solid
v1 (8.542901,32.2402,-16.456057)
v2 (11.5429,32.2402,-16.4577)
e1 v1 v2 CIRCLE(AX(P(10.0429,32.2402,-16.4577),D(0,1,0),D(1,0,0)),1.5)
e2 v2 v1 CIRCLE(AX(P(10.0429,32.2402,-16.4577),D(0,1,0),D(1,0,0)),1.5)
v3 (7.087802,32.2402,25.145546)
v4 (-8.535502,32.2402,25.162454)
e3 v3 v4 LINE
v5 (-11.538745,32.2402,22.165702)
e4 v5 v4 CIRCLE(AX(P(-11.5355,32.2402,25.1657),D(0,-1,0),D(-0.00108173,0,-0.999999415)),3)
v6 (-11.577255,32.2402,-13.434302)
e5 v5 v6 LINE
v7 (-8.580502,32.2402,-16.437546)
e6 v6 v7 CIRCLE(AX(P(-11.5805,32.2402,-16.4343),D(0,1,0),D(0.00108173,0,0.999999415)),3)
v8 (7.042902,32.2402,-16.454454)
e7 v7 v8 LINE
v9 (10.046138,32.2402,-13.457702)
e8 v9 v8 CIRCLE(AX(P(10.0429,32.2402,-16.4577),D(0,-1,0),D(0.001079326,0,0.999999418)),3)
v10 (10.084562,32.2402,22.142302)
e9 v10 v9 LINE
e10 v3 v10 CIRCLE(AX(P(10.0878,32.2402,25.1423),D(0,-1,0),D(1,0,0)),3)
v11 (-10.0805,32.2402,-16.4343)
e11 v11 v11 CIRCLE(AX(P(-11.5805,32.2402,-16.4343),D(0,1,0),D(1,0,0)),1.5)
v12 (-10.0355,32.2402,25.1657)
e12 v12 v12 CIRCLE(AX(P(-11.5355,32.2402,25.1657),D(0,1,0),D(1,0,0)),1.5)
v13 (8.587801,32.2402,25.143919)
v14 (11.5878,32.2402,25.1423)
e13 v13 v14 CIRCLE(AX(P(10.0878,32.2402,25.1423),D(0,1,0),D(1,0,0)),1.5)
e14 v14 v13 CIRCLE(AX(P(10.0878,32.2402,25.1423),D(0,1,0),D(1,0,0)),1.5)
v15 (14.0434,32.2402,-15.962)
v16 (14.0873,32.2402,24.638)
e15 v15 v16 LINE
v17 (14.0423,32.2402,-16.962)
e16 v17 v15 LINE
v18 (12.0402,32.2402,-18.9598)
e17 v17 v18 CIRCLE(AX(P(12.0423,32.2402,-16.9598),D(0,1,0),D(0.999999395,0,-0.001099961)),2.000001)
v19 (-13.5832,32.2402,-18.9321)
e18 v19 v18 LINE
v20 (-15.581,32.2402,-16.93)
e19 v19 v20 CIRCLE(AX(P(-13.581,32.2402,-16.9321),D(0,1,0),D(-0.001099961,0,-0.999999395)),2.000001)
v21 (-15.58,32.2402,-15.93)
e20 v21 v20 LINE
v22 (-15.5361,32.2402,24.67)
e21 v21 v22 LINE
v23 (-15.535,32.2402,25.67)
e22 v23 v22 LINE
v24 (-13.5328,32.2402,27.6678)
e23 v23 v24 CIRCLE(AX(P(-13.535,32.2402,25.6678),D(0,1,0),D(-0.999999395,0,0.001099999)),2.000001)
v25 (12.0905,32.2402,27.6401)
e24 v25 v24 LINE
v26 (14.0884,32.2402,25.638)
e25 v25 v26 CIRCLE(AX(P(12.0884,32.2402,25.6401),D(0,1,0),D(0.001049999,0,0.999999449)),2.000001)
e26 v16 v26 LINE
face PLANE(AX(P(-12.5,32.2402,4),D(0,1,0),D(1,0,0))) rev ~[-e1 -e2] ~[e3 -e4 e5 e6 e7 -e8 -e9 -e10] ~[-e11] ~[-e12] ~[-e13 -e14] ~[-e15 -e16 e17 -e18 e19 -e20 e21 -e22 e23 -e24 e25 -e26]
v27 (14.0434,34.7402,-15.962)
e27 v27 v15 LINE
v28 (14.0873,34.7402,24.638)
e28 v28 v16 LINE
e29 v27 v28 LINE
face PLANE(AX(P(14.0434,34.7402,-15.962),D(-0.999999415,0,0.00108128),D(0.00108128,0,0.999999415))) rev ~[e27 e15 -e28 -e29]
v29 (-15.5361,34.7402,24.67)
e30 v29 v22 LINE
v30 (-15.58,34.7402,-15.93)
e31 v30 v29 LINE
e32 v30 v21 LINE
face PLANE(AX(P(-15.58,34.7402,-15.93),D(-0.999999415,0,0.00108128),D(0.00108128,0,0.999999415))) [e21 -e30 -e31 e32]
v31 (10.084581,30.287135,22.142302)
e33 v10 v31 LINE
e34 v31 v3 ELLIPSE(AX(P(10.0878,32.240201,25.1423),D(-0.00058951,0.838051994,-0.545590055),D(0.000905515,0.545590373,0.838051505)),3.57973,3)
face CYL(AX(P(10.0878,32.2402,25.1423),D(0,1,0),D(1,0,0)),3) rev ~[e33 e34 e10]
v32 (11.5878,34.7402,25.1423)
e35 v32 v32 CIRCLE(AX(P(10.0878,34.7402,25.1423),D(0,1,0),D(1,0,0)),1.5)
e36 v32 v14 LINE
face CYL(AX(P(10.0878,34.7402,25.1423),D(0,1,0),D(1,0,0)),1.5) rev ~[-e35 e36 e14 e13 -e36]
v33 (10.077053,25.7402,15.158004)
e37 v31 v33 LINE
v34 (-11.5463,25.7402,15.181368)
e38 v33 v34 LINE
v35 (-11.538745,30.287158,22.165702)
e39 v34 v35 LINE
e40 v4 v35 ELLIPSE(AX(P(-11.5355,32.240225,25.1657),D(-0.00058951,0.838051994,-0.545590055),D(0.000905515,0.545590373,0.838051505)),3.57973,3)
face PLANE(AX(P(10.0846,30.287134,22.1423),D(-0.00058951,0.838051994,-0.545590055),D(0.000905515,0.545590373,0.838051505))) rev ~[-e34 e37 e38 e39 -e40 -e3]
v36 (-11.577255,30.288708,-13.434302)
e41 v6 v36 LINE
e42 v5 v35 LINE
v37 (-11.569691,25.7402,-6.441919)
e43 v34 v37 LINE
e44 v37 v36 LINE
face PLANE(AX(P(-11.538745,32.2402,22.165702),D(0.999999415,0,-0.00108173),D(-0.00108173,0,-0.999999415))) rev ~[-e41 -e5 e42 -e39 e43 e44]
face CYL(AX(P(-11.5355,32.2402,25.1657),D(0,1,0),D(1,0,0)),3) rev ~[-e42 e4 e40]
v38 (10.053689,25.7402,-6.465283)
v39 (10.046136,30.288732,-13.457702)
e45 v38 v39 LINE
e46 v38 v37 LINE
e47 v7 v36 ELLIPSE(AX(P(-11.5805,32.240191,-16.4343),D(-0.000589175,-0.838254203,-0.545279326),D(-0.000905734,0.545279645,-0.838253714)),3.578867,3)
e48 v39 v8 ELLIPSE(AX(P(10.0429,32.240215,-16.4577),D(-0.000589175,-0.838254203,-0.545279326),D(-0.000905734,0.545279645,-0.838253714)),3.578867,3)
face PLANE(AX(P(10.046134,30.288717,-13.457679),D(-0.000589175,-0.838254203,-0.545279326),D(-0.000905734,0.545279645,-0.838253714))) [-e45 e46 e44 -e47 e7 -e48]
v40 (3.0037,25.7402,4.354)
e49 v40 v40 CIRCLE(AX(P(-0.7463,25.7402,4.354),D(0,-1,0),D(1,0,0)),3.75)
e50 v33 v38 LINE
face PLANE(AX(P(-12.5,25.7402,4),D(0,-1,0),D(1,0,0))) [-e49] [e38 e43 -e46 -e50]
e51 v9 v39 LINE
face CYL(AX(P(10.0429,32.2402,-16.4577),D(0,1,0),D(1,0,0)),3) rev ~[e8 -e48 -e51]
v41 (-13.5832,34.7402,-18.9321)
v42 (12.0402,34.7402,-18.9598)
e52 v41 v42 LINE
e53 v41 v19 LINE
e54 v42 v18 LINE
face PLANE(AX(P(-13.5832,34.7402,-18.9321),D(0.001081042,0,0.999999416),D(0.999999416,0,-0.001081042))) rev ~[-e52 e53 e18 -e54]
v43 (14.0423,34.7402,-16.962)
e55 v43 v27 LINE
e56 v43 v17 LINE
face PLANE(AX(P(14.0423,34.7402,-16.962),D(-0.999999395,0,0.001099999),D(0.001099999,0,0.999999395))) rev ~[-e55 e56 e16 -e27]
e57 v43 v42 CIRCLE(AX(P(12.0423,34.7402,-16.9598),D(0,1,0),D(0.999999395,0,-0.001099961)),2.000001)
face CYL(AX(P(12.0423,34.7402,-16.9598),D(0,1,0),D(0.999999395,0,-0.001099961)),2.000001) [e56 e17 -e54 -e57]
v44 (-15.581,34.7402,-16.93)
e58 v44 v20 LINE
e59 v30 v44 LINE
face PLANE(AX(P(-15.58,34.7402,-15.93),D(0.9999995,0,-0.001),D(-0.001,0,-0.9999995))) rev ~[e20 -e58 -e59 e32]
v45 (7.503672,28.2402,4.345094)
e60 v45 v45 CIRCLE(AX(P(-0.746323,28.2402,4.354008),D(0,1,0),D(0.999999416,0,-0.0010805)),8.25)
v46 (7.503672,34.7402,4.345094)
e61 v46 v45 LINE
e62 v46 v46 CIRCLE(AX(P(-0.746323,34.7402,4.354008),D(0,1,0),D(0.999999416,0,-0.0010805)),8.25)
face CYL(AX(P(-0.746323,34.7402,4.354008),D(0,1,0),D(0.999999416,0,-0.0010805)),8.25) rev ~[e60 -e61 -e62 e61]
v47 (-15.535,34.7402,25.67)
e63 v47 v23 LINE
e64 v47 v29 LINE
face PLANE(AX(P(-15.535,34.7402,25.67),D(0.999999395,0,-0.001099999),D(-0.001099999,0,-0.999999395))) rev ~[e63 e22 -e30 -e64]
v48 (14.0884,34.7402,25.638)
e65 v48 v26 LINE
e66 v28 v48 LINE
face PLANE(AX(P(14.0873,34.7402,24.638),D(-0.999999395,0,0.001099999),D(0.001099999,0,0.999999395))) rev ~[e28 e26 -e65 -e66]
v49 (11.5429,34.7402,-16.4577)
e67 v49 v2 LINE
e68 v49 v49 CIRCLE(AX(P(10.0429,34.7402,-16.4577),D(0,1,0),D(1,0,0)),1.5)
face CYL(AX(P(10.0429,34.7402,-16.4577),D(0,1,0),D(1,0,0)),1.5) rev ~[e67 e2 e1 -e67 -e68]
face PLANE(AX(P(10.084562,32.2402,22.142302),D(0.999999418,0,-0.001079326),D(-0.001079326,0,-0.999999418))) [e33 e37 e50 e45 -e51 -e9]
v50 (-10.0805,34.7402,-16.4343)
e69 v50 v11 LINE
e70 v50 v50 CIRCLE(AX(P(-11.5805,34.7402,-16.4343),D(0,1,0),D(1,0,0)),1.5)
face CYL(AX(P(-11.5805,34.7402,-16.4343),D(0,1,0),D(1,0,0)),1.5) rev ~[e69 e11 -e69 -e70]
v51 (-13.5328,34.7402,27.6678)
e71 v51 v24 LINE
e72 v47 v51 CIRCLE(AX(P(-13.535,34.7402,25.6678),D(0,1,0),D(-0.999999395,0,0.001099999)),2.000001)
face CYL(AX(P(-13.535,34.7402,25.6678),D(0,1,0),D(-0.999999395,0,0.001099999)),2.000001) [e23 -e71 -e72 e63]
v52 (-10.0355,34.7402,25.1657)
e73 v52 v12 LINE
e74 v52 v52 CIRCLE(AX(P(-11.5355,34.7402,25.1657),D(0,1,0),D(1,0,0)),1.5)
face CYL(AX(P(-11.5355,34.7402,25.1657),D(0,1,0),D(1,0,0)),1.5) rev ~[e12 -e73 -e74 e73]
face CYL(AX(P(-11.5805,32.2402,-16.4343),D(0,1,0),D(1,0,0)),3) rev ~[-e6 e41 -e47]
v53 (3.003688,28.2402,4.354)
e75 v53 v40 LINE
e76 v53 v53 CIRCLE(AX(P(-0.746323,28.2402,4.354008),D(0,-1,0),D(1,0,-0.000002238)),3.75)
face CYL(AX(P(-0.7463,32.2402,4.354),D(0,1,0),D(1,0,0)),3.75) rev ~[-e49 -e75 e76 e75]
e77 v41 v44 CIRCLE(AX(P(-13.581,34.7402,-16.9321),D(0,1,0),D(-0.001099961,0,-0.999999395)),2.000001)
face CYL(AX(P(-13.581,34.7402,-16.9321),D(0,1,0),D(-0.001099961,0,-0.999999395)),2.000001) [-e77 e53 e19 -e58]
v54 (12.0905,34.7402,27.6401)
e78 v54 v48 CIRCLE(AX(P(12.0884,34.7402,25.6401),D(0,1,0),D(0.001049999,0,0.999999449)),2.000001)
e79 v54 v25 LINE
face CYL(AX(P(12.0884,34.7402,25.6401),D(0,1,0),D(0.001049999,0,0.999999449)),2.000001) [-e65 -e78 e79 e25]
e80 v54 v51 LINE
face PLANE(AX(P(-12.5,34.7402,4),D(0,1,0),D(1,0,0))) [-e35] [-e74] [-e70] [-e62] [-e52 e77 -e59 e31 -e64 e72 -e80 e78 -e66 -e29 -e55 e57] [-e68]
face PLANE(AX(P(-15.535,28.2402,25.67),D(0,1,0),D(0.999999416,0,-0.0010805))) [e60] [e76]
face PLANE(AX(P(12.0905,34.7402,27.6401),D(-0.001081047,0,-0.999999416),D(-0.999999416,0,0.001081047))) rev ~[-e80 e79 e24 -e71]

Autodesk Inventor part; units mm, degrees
ref_plane "YZ Plane" through (0, 0, 0) normal (1, 0, 0) x (0, 1, 0)
sketch "Sketch1" plane through (0, 0, 0) normal (0, 0, 1) x (1, 0, 0)
  circle A0 centre (10.25, -9.75) radius 1.1 projected
  circle A1 centre (-10.25, -9.75) radius 1.1 projected
  circle A2 centre (-10.25, 3.75) radius 1.1 projected
  circle A3 centre (10.25, 3.75) radius 1.1 projected
  circle A4 centre (9.25, -4) radius 1.5 projected
  circle A5 centre (-9.25, -4) radius 1.5 projected
  arc A6 (7.25, -4) -> (11.25, -4) centre (9.25, -4) ccw
  arc A7 (-11.25, -4) -> (-7.25, -4) centre (-9.25, -4) ccw
  line L0 (8.2, -12) -> (-8.2, -12) projected
  line L1 (12.5, 1) -> (12.5, -7.7) projected
  line L2 (-12.5, 12) -> (12.5, 12) projected
  line L3 (-12.5, -7.7) -> (-12.5, 1) projected
  line L4 (12.5, -12) -> (-12.5, -12)
  line L5 (-12.5, -12) -> (-12.5, 12)
  line L6 (-12.5, 12) -> (12.5, 12)
  line L7 (12.5, 12) -> (12.5, -12)
  line L8 (-9.25, -4) -> (-9.25, -3)
  line L9 (9.25, -4) -> (9.25, -3)
  line L10 (-11.25, -4) -> (-11.25, -3)
  line L11 (-7.25, -4) -> (-7.25, -3)
  line L12 (7.25, -4) -> (7.25, -3)
  line L13 (11.25, -4) -> (11.25, -3)
  arc A8 (-9.25, -5) -> (-7.7976, -4.375) centre (-9.25, -3) ccw
  arc A9 (-7.25, -3) -> (-11.25, -3) centre (-9.25, -3) ccw
  arc A10 (9.25, -5) -> (10.7024, -4.375) centre (9.25, -3) ccw
  arc A11 (11.25, -3) -> (7.25, -3) centre (9.25, -3) ccw
  point P0 (0, 0)
  dimension "d0" = 0.5
  dimension "d1" = 0.5
  dimension "d70" = 1
  dimension "d74" = 3.25
extrude "Extrusion1" add sketch "Sketch1" along normal blind 3 contours L0 L4 L5 L3 L2 L7 L1
sketch "Sketch2" plane through (-12.5, 12, 0) normal (0, 1, 0) x (1, 0, 0)
  line L0 (25, 0) -> (0, 0) projected
  line L1 (0, 0) -> (0, -3) projected
  line L2 (25, -3) -> (0, -3) projected
  line L3 (25, 0) -> (25, -3) projected
  point P0 (12.5, 0)
extrude "Extrusion2" add sketch "Sketch2" along normal blind 2
sketch "Sketch3" plane through (-12.5, 14, 0) normal (0, 1, 0) x (1, 0, 0)
  line L0 (0, 1) -> (25, 1) projected
  line L1 (25, 0) -> (0, 0) projected
  line L2 (0, -3) -> (25, -3) projected
  line L3 (0, -4) -> (25, -4)
  line L4 (0, 1) -> (25, 1)
  line L5 (25, 1) -> (25, -4)
  line L6 (25, -4) -> (0, -4)
  line L7 (0, -4) -> (0, 1)
  point P0 (12.5, 0)
  dimension "d6" = 1
extrude "Extrusion3" add sketch "Sketch3" along normal blind 7.5
sketch "Sketch8" plane through (-12.5, -12, 0) normal (-1, 0, 0) x (0, 0, 1)
  line L0 (4, 24) -> (3, 24)
  line L1 (3, 26) -> (4, 26) projected
  line L2 (3, 0) -> (3, 26) projected
  line L3 (0, 0) -> (0, 26) projected
  line L4 (-1, 26) -> (0, 26) projected
  line L5 (4, 24.1) -> (3, 24.1)
  line L6 (4, 24.1) -> (-1, 24.1)
  line L7 (0, 24.1) -> (-1, 24.1)
  line L8 (-1, 24.1) -> (-1, 26)
  line L9 (-1, 26) -> (0, 26)
  line L10 (0, 26) -> (0, 24.1)
  line L11 (3, 24.1) -> (4, 24.1)
  line L12 (4, 24.1) -> (4, 26)
  line L13 (4, 26) -> (3, 26)
  line L14 (3, 26) -> (3, 24.1)
  point P0 (0, 12)
  dimension "d22" = 0.1
extrude "Extrusion7" add sketch "Sketch8" against normal up to surface (25 mm away)
sketch "Sketch9" plane through (0, 0, 3) normal (0, 0, 1) x (1, 0, 0)
  circle A0 centre (10.25, -9.75) radius 1.1
  circle A1 centre (10.25, 3.75) radius 1.1
  circle A2 centre (-10.25, 3.75) radius 1.1
  circle A3 centre (-10.25, -9.75) radius 1.1
  circle A4 centre (-10.25, -9.75) radius 1
  circle A5 centre (-10.25, 3.75) radius 1
  circle A6 centre (10.25, 3.75) radius 1
  circle A7 centre (10.25, -9.75) radius 1
  point P0 (0, 0)
  dimension "d25" = 0.1
  dimension "d26" = 0.1
  dimension "d27" = 0.1
  dimension "d28" = 0.1
ref_plane "Work Plane1" through (-12.5, 0.8429, -0.9) normal (0, 0, -1) x (0, 1, 0)
extrude "Extrusion8" add sketch "Sketch9" against normal up to surface (3.9 mm away) contours A4 | A5 | A6 | A7
sketch "Sketch10" plane through (-10.25, 3.75, 3) normal (0, 0, 1) x (1, 0, 0)
  circle A0 centre (0, 0) radius 1.1
  circle A1 centre (0, -13.5) radius 1.1
  circle A2 centre (20.5, -13.5) radius 1.1
  circle A3 centre (20.5, 0) radius 1.1
  point P0 (10.25, -3.75)
extrude "Extrusion9" add sketch "Sketch10" against normal up to surface (3 mm away)
sketch "Sketch11" plane through (0, 0, 3) normal (0, 0, 1) x (1, 0, 0)
  circle A0 centre (10.25, -9.75) radius 1 projected
  circle A1 centre (10.25, 3.75) radius 1 projected
  circle A2 centre (-10.25, 3.75) radius 1 projected
  circle A3 centre (-10.25, -9.75) radius 1 projected
  point P0 (0, 0)
ref_plane "Work Plane2" through (8.65, 0.8429, 3.9) normal (0, 0, 1) x (1, 0, 0)
extrude "Extrusion10" add sketch "Sketch11" along normal up to surface (0.9 mm away)
sketch "Sketch12" plane through (-12.5, 21.5, 4) normal (0, 0, 1) x (1, 0, 0)
  line L0 (25, -9.4) -> (25, 0) projected
  line L1 (25, 0) -> (25, -4.7)
  line L2 (25, -4.7) -> (30, -4.7)
  line L3 (30, -4.7) -> (30, 0)
  line L4 (30, 0) -> (25, 0)
  line L5 (25, 0) -> (25, -4.7)
  line L6 (0, -9.4) -> (0, 0) projected
  line L7 (0, 0) -> (25, 0) projected
  line L8 (0, 0) -> (-5, 0)
  line L9 (-5, 0) -> (-5, -4.7)
  line L10 (-5, -4.7) -> (0, -4.7)
  line L11 (0, -4.7) -> (0, 0)
  point P0 (12.5, -21.5)
  dimension "d35" = 5
  dimension "d36" = 5
extrude "Extrusion11" add sketch "Sketch12" against normal up to surface (5 mm away)
sketch "Sketch13" plane through (-12.5, -12, 0) normal (0, -1, 0) x (1, 0, 0)
  line L0 (0, 0) -> (0, 3) projected
  line L1 (25, 0) -> (25, 3) projected
  line L2 (25.2, 0) -> (25.2, 3)
  line L3 (-0.2, 0) -> (-0.2, 3)
  line L4 (-5, 4) -> (-5, -1) projected
  line L5 (-5, -1) -> (0, -1) projected
  line L6 (-5, 4) -> (0, 4) projected
  line L7 (25, -1) -> (30, -1) projected
  line L8 (30, 4) -> (30, -1) projected
  line L9 (25, 4) -> (30, 4) projected
  line L10 (30, -1) -> (25.2, -1)
  line L11 (25.2, -1) -> (25.2, 4)
  line L12 (25.2, 4) -> (30, 4)
  line L13 (30, 4) -> (30, -1)
  line L14 (-5, -1) -> (-0.2, -1)
  line L15 (-0.2, -1) -> (-0.2, 4)
  line L16 (-0.2, 4) -> (-5, 4)
  line L17 (-5, 4) -> (-5, -1)
  line L18 (0, 0) -> (25, 0) projected
  line L19 (0, 0) -> (-0.2, 0)
  line L20 (0, 3) -> (-0.2, 3)
  line L21 (25, -1) -> (25, 0) projected
  line L22 (25, 0) -> (25.2, 0)
  line L23 (25, 3) -> (25.2, 3)
  point P0 (12.5, 0)
  point P1 (-0.2, 3)
  point P2 (-0.2, 0)
  dimension "d39" = 0.2
  dimension "d40" = 0.2
extrude "Extrusion12" add sketch "Sketch13" against normal blind 5.5 contours L19 L3 L20 L0 | L15 L5 L4 L6 L3 | L1 L23 L2 L22 | L2 L11 L9 L8 L7
sketch "Sketch14" plane through (-12.5, -6.5, 0) normal (0, 1, 0) x (1, 0, 0)
  circle A0 centre (-2.6, -1.5) radius 1.5
  circle A1 centre (27.6, -1.5) radius 1.5
  circle A2 centre (27.6, -1.5) radius 1.4
  circle A3 centre (-2.6, -1.5) radius 1.4
  point P0 (12.5, 0)
  dimension "d43" = 0.1
  dimension "d44" = 0.1
extrude "Extrusion13" cut sketch "Sketch14" against normal blind 5.5 contours A2 | A3
chamfer "Chamfer3" distance 0.2 angle 45 8 edges at (-12.7, -9.25, 4) (-17.5, -9.25, 4) (-12.7, -9.25, -1) (-17.5, -9.25, -1) (17.5, -9.25, 4) (12.7, -9.25, 4) (17.5, -9.25, -1) (12.7, -9.25, -1)
chamfer "Chamfer4" distance 3.9999 angle 45 2 edges at (-12.5, -6.5, 1.5) (12.5, -6.5, 1.5)
sketch "Sketch15" plane through (-17.5, 16.8, 4) normal (-1, 0, 0) x (0, 0, 1)
  circle A0 centre (-2.5, 2.35) radius 1.5
  circle A1 centre (-2.5, 2.35) radius 1.4
  point P0 (-4, -16.8)
  dimension "d53" = 0.1
extrude "Extrusion14" cut sketch "Sketch15" against normal blind 5.5 contours A1
sketch "Sketch16" plane through (17.5, 16.8, 4) normal (1, 0, 0) x (0, 0, -1)
  circle A0 centre (2.5, 2.35) radius 1.4 projected
  point P0 (4, -16.8)
extrude "Extrusion15" cut sketch "Sketch16" against normal blind 5.5
sketch "Sketch17" plane through (-12.5, 12.1, 4) normal (0, 0, 1) x (1, 0, 0)
  line L0 (25, 0) -> (25, 4.7) projected
  line L1 (0, 0) -> (0, 4.7) projected
  line L2 (30, 9.4) -> (-5, 9.4) projected
  line L3 (24.5905, 22.6402) -> (-1.0328, 22.6402)
  line L4 (25, 9.4) -> (0, 9.4)
  line L5 (0, 9.4) -> (0, 22.6402)
  line L6 (0, 22.6402) -> (25, 22.6402)
  line L7 (25, 22.6402) -> (25, 9.4)
  point P0 (12.5, -12.1)
  dimension "d58" = 25
extrude "Extrusion16" add sketch "Sketch17" against normal up to surface (5 mm away)
sketch "Sketch18" plane through (-12.5, 34.7402, 4) normal (0, 1, 0) x (1, 0, 0)
  circle A0 centre (22.5429, 20.4577) radius 1.5 construction
  circle A1 centre (22.5429, 20.4577) radius 1.5
  circle A2 centre (0.9195, 20.4343) radius 1.5
  circle A3 centre (22.5878, -21.1423) radius 1.5
  circle A4 centre (0.9645, -21.1657) radius 1.5
  line L0 (24.5905, -23.6401) -> (-1.0328, -23.6678)
  arc A5 (24.5905, -23.6401) -> (26.5884, -21.638) centre (24.5884, -21.6401) ccw
  line L1 (26.5873, -20.638) -> (26.5884, -21.638)
  arc A6 (-3.035, -21.67) -> (-1.0328, -23.6678) centre (-1.035, -21.6678) ccw
  line L2 (-3.035, -21.67) -> (-3.0361, -20.67)
  line L3 (26.5423, 20.962) -> (26.5434, 19.962)
  arc A7 (26.5423, 20.962) -> (24.5402, 22.9598) centre (24.5423, 20.9598) ccw
  line L4 (-1.0832, 22.9321) -> (24.5402, 22.9598)
  line L5 (-1.0832, 22.9321) -> (24.5402, 22.9598)
  arc A8 (-1.0832, 22.9321) -> (-3.081, 20.93) centre (-1.081, 20.9321) ccw
  line L6 (-3.08, 19.93) -> (-3.081, 20.93)
  line L7 (-3.08, 19.93) -> (-3.0361, -20.67)
  line L8 (26.5434, 19.962) -> (26.5873, -20.638)
  point P0 (12.5, 4)
extrude "Extrusion17" add sketch "Sketch18" against normal blind 2.5
sketch "Sketch22" plane through (-12.5, 32.2402, 4) normal (0, -1, 0) x (1, 0, 0)
  line L0 (40.0329, 38.7094) -> (-19.6341, 38.7094)
  line L1 (-19.6341, 38.7094) -> (-19.6341, -37.2102)
  line L2 (-19.6341, -37.2102) -> (40.0329, -37.2102)
  line L3 (40.0329, -37.2102) -> (40.0329, 38.7094)
  point P0 (12.5, -4)
extrude "Extrusion21" cut sketch "Sketch22" along normal blind 48.75
sketch "Sketch23" plane through (-12.5, 32.2402, 4) normal (0, -1, 0) x (1, 0, 0)
  circle A0 centre (0.9195, -20.4343) radius 1.5 projected
  circle A1 centre (0.9645, 21.1657) radius 1.5 projected
  circle A2 centre (22.5878, 21.1423) radius 1.5 projected
  circle A3 centre (22.5429, -20.4577) radius 1.5 projected
  circle A4 centre (0.9195, -20.4343) radius 3
  circle A5 centre (22.5429, -20.4577) radius 3
  circle A6 centre (22.5878, 21.1423) radius 3
  circle A7 centre (0.9645, 21.1657) radius 3
  circle A8 centre (0.9645, 21.1657) radius 1.5 projected
  circle A9 centre (22.5878, 21.1423) radius 1.5 projected
  circle A10 centre (0.9195, -20.4343) radius 1.5 projected
  circle A11 centre (22.5429, -20.4577) radius 1.5 projected
  line L0 (-3.035, 21.67) -> (-3.081, -20.93) projected
  arc A12 (-3.081, -20.93) -> (-1.0832, -22.9321) centre (-1.081, -20.9321) ccw projected
  line L1 (-1.0832, -22.9321) -> (24.5402, -22.9598) projected
  arc A13 (24.5402, -22.9598) -> (26.5423, -20.962) centre (24.5423, -20.9598) ccw projected
  line L2 (26.5423, -20.962) -> (26.5884, 21.638) projected
  arc A14 (26.5884, 21.638) -> (24.5905, 23.6401) centre (24.5884, 21.6401) ccw projected
  line L3 (24.5905, 23.6401) -> (-1.0328, 23.6678) projected
  arc A15 (-1.0328, 23.6678) -> (-3.035, 21.67) centre (-1.035, 21.6678) ccw projected
  line L4 (0.9645, 21.1657) -> (22.5429, -20.4577)
  circle A16 centre (11.7537, 0.354) radius 3.75
  line L5 (0.9645, 21.1657) -> (0.9195, -20.4343)
  line L6 (0.9195, -20.4343) -> (22.5429, -20.4577)
  line L7 (22.5878, 21.1423) -> (22.5429, -20.4577)
  line L8 (22.5878, 21.1423) -> (0.9645, 21.1657)
  point P0 (12.5, -4)
  point P1 (22.5461, -17.4577)
  point P2 (22.5846, 18.1423)
  point P3 (19.5878, 21.1455)
  point P4 (3.9645, 21.1624)
  point P5 (0.9612, 18.1657)
  point P6 (0.9227, -17.4343)
  point P7 (3.9195, -20.4375)
  point P8 (19.5429, -20.4544)
  dimension "d84" = 6
  dimension "d85" = 6
  dimension "d86" = 6
  dimension "d87" = 6
  dimension "d88" = 7.5
extrude "Extrusion22" add sketch "Sketch23" along normal blind 6.5 contours A4 L5 A7 L4 A16 A5 L6 | L4 A16 A7 L8 A6 L7 A5
sketch "Sketch26" plane through (-15.535, 34.7402, 25.67) normal (0, 1, 0) x (0.9999994, 0, -0.0010805)
  circle A0 centre (14.8117, 21.3) radius 3.75 projected
  point P0 (15.5627, 25.6532)
extrude "Extrusion24" cut sketch "Sketch26" against normal through all
sketch "Sketch27" plane through (-15.535, 34.7402, 25.67) normal (0, 1, 0) x (0.9999994, 0, -0.0010805)
  circle A0 centre (14.8117, 21.3) radius 3.75 projected
  circle A1 centre (14.8117, 21.3) radius 8.25
  point P0 (15.5627, 25.6532)
  dimension "d96" = 16.5
extrude "Extrusion25" cut sketch "Sketch27" against normal blind 6.5
sketch "Sketch28" plane through (10.0846, 25.7402, 22.1423) normal (0.9999994, 0, -0.0010805) x (-0.0010805, 0, -0.9999994)
  line L0 (35.6, 6.5) -> (35.6, 0) projected
  line L1 (35.6, 0) -> (0, 0) projected
  line L2 (38.6, 6.5) -> (38.6, 0) projected
  line L3 (38.6, 0) -> (35.6, 0) projected
  line L4 (39.1, 6.5) -> (-3.5, 6.5) projected
  line L5 (0, 6.5) -> (0, 0) projected
  line L6 (0, 0) -> (-3, 0) projected
  line L7 (-3, 6.5) -> (-3, 0) projected
  line L8 (28.6076, 0) -> (33.2318, -2.9777)
  line L9 (2.3601, -2.9777) -> (6.9843, 0)
  line L10 (28.6076, 0) -> (38.6, 6.5)
  line L11 (6.9843, 0) -> (-3, 6.5)
  point P0 (22.1532, -25.7402)
extrude "Extrusion26" cut sketch "Sketch28" against normal through all contours L10 L2 L3 L0 | L0 L1 L10 | L11 L5 L6 L7 | L11 L1 L5
properties part number "cameraholder_3DPrint"
